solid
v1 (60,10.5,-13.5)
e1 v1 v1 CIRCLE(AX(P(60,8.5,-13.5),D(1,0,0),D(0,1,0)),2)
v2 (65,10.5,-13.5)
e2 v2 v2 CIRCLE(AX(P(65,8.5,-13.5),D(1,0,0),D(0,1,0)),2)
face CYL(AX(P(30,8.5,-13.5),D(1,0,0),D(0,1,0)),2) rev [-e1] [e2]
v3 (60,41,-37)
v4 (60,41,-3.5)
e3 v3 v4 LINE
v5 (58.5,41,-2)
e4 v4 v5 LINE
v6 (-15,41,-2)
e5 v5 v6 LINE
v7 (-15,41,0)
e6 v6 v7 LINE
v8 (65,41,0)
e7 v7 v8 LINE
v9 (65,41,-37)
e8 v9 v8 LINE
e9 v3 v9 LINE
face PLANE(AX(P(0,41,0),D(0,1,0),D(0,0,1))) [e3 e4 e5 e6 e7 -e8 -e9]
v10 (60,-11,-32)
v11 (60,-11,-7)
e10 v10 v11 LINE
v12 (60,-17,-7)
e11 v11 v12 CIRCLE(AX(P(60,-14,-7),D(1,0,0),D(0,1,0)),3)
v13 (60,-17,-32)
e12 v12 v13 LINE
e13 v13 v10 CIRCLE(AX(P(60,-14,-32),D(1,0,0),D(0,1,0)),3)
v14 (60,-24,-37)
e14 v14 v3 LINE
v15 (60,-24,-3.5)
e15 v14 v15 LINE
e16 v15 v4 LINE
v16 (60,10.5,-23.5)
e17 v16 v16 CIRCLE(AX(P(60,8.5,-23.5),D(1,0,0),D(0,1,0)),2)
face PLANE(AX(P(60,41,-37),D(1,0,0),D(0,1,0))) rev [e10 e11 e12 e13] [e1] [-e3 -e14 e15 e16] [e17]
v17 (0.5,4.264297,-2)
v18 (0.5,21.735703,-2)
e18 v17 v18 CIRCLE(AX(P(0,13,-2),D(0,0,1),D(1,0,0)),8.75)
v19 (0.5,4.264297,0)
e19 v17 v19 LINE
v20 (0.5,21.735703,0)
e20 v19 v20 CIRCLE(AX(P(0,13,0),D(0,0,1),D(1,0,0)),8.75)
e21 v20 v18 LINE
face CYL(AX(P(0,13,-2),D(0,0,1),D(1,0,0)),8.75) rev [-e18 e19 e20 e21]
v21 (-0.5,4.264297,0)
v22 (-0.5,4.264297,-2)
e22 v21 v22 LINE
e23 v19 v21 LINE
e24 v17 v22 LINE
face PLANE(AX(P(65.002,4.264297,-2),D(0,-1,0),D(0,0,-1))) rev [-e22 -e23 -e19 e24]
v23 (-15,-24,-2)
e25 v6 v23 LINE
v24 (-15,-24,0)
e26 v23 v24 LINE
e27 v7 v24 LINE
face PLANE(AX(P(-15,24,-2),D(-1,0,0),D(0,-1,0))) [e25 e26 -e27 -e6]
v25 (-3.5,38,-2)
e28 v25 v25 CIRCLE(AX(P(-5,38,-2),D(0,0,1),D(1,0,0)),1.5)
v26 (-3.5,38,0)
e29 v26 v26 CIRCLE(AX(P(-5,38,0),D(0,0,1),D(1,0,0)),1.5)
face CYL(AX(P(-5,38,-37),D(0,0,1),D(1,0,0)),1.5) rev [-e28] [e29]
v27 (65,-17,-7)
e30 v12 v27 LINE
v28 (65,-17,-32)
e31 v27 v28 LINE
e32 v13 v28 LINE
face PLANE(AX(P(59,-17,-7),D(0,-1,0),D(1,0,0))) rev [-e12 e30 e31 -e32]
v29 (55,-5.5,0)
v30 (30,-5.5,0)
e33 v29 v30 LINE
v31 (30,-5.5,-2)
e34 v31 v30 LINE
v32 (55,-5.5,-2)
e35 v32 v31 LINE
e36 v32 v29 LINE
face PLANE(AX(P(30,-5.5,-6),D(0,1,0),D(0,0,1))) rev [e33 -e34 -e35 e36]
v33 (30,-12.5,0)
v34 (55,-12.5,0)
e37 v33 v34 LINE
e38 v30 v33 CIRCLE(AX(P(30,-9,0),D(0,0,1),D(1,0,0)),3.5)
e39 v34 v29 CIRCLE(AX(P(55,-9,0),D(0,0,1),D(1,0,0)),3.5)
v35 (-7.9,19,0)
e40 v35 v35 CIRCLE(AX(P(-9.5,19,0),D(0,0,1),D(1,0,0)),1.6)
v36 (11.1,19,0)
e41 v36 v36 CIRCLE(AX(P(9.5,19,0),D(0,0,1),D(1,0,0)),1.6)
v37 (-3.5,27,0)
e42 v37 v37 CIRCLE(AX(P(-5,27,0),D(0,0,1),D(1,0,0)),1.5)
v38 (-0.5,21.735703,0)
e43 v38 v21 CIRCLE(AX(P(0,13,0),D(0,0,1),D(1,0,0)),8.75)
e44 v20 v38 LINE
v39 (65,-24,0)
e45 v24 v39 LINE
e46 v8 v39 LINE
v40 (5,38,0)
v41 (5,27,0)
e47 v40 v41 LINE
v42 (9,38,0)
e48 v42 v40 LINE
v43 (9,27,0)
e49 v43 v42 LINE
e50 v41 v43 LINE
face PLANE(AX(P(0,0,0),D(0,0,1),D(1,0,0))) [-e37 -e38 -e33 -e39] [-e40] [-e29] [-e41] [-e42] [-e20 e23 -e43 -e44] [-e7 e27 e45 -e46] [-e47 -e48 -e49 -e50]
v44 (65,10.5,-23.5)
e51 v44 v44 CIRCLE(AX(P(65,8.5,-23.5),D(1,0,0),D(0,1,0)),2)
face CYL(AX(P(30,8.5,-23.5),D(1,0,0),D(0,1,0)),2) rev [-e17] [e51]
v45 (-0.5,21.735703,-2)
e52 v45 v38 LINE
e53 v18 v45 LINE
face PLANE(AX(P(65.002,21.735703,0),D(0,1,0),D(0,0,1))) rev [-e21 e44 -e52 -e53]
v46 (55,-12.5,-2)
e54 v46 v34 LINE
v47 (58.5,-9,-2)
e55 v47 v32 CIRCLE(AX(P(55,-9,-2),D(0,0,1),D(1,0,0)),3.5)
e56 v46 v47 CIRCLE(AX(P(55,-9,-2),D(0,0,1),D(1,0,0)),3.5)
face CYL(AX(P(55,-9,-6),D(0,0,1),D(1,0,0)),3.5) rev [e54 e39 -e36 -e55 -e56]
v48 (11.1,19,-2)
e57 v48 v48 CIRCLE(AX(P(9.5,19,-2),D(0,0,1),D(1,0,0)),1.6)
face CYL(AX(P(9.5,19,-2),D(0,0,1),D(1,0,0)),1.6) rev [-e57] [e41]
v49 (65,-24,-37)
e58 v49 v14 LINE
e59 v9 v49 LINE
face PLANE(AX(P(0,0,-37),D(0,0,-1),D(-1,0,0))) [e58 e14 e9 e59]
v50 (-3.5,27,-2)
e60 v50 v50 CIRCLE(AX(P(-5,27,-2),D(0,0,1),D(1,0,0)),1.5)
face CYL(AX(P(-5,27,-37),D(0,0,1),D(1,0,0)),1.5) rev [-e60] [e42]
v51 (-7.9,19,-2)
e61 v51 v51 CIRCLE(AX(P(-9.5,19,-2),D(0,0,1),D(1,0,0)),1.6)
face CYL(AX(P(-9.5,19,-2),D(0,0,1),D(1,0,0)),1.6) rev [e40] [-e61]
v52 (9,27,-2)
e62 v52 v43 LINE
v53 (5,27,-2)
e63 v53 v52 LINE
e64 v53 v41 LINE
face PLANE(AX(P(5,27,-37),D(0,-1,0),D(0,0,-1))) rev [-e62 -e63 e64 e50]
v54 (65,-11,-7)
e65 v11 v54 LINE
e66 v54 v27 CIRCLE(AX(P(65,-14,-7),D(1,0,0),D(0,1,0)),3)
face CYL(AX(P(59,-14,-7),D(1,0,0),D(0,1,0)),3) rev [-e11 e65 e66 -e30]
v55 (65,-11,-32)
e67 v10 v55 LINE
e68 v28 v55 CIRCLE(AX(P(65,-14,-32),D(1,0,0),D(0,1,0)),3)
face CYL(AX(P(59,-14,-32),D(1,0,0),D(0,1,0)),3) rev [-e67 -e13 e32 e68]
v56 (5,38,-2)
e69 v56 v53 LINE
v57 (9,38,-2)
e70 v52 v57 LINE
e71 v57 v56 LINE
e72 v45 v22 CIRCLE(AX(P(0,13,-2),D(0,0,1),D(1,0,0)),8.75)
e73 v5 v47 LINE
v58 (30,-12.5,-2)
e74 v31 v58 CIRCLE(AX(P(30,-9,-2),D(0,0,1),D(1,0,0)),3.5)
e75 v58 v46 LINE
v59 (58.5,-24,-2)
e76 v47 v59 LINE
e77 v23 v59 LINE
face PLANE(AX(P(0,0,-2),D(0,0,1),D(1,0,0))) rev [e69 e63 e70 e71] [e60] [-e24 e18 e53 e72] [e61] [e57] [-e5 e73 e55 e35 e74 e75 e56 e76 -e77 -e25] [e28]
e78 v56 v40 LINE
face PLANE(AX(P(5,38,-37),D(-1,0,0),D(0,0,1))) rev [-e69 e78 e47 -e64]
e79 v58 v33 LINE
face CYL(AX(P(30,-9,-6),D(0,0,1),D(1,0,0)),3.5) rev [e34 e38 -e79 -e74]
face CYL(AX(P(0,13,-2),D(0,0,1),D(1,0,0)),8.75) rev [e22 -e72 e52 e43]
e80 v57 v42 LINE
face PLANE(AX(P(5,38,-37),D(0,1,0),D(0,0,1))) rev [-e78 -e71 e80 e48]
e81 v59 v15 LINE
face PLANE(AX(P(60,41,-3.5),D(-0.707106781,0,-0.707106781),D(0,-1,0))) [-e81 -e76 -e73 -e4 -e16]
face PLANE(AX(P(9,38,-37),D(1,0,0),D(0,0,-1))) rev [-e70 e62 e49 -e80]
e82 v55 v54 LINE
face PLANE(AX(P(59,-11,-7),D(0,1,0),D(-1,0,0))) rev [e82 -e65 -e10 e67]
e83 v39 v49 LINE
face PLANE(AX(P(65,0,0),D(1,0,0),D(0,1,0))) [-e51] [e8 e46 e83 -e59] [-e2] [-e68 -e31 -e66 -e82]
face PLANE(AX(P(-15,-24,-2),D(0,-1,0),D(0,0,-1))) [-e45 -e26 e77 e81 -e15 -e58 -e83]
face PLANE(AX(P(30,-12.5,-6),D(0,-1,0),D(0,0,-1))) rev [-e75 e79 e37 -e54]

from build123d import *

# Parameters (mm, degrees)
SKETCH_1_W           = 30
SKETCH_1_H           = 48
EXTRUDE_1_DEPTH      = 2
SKETCH_2_R           = 1.6
CUT_EXTRUDE_1_DEPTH  = 2
SKETCH_3_R           = 8.75
CUT_EXTRUDE_2_DEPTH  = 2
SKETCH_4_W           = 30
SKETCH_4_H           = 2
EXTRUDE_2_DEPTH      = 17
SKETCH_14_W          = 0.5
SKETCH_14_H          = 2
CUT_EXTRUDE_6_DEPTH  = 67.738294854
SKETCH_15_W          = 2
SKETCH_15_H          = 65
EXTRUDE_7_DEPTH      = 50
SKETCH_16_W          = 5
SKETCH_16_H          = 65
EXTRUDE_8_DEPTH      = 35
SKETCH_17_R          = 2
CUT_EXTRUDE_7_DEPTH  = 35
SKETCH_18_W          = 2
SKETCH_18_H          = 28.264297395
EXTRUDE_9_DEPTH      = 1
EXTRUDE_10_REACH     = 87.675
SKETCH_19_W          = 2
SKETCH_19_H          = 19.264297395
CUT_EXTRUDE_8_DEPTH  = 6
CUT_EXTRUDE_9_DEPTH  = 6
CHAMFER_1_SIZE       = 1.5
SKETCH_22_R          = 1.5
SKETCH_22_W          = 4
SKETCH_22_H          = 11
CUT_EXTRUDE_10_DEPTH = 86.293610546


with BuildPart() as part:
    # 草图1 → 凸台-拉伸1 (new body)
    with BuildSketch(Plane.XY):
        Rectangle(SKETCH_1_W, SKETCH_1_H)
    extrude(amount=-EXTRUDE_1_DEPTH)

    # 草图2 → 切除-拉伸1 (cut)
    with BuildSketch(Plane.XY):
        with Locations((-9.5, 19)):
            Circle(SKETCH_2_R)
        with Locations((9.5, 19)):
            Circle(SKETCH_2_R)
    extrude(amount=-CUT_EXTRUDE_1_DEPTH, mode=Mode.SUBTRACT)

    # 草图3 → 切除-拉伸2 (cut)
    with BuildSketch(Plane.XY):
        with Locations((0, 13)):
            Circle(SKETCH_3_R)
    extrude(amount=-CUT_EXTRUDE_2_DEPTH, mode=Mode.SUBTRACT)

    # 草图4 → 凸台-拉伸2 (add)
    with BuildSketch(Plane(origin=(0, 24, 0), x_dir=(1, 0, 0), z_dir=(0, 1, 0))):
        with Locations((0, 1)):
            Rectangle(SKETCH_4_W, SKETCH_4_H)
    extrude(amount=EXTRUDE_2_DEPTH)

    # 草图14 → 切除-拉伸6 (cut, through all)
    with BuildSketch(Plane.XZ.offset(24)):
        with Locations((-0.25, -1)):
            Rectangle(SKETCH_14_W, SKETCH_14_H)
    extrude(amount=-CUT_EXTRUDE_6_DEPTH, mode=Mode.SUBTRACT)


with BuildPart() as cut_extrude_6_piece_1:
    # of the separate pieces the step leaves, piece 1, a body of its own (cut_extrude_6_pieces)
    add(part.part.solids().sort_by_distance((15, -24, 0))[0])

    # 草图15 → 凸台-拉伸7 (add)
    with BuildSketch(Plane(origin=(15, 0, 0), x_dir=(0, 0, -1), z_dir=(1, 0, 0))):
        with Locations((1, 8.5)):
            Rectangle(SKETCH_15_W, SKETCH_15_H)
    extrude(amount=EXTRUDE_7_DEPTH)

    # 草图16 → 凸台-拉伸8 (add)
    with BuildSketch(Plane(origin=(0, 0, -2), x_dir=(-1, 0, 0), z_dir=(0, 0, -1))):
        with Locations((-62.5, 8.5)):
            Rectangle(SKETCH_16_W, SKETCH_16_H)
    extrude(amount=EXTRUDE_8_DEPTH)

    # 草图17 → 切除-拉伸7 (cut)
    with BuildSketch(Plane(origin=(65, 0, 0), x_dir=(0, 0, -1), z_dir=(1, 0, 0))):
        with Locations(Location((13.5, 8.5, 0), (0, 0, 90))):
            Circle(SKETCH_17_R)
        with Locations(Location((23.5, 8.5, 0), (0, 0, 90))):
            Circle(SKETCH_17_R)
    extrude(amount=-CUT_EXTRUDE_7_DEPTH, mode=Mode.SUBTRACT)



with BuildPart() as cut_extrude_6_piece_2:
    # of the separate pieces the step leaves, piece 2, a body of its own (cut_extrude_6_pieces)
    add(part.part.solids().sort_by_distance((-15, -24, 0))[0])


with BuildPart() as cut_extrude_6_piece_1_1:
    add(cut_extrude_6_piece_1.part)

    add(cut_extrude_6_piece_2.part)  # 凸台-拉伸9 merges 切除-拉伸6 piece 2
    # 草图18 → 凸台-拉伸9 (add)
    with BuildSketch(Plane(origin=(-0.5, 0, 0), x_dir=(0, 0, -1), z_dir=(1, 0, 0))):
        with Locations((1, -9.867851303)):
            Rectangle(SKETCH_18_W, SKETCH_18_H)
    extrude(amount=EXTRUDE_9_DEPTH)

    # 草图19 → 凸台-拉伸10 (add, up to next)
    with BuildSketch(Plane(origin=(-0.5, 0, 0), x_dir=(0, 0, -1), z_dir=(1, 0, 0)), mode=Mode.PRIVATE) as extrude_10_sk1:
        with Locations((1, 31.367851303)):
            Rectangle(SKETCH_19_W, SKETCH_19_H)
    extrude_10_tool1 = extrude(extrude_10_sk1.sketch, amount=EXTRUDE_10_REACH, mode=Mode.PRIVATE) - cut_extrude_6_piece_1_1.part
    add(extrude_10_tool1.solids().sort_by_distance((-0.5, 31.367851, -1))[0])

    # 草图20 → 切除-拉伸8 (cut)
    with BuildSketch(Plane.XY):
        with BuildLine():
            Line((30, -5.5), (55, -5.5))
            ThreePointArc((55, -5.5), (58.5, -9), (55, -12.5))
            Line((55, -12.5), (30, -12.5))
            ThreePointArc((30, -12.5), (26.5, -9), (30, -5.5))
        make_face()
    extrude(amount=-CUT_EXTRUDE_8_DEPTH, mode=Mode.SUBTRACT)

    # 草图21 → 切除-拉伸9 (cut)
    with BuildSketch(Plane(origin=(65, 0, 0), x_dir=(0, 0, -1), z_dir=(1, 0, 0))):
        with BuildLine():
            Line((7, -11), (32, -11))
            ThreePointArc((32, -11), (35, -14), (32, -17))
            Line((32, -17), (7, -17))
            ThreePointArc((7, -17), (4, -14), (7, -11))
        make_face()
    extrude(amount=-CUT_EXTRUDE_9_DEPTH, mode=Mode.SUBTRACT)

    # 倒角1
    chamfer_1_edges = [cut_extrude_6_piece_1_1.edges().sort_by_distance(p)[0] for p in [
        (60, 8.5, -2),
    ]]
    chamfer(chamfer_1_edges, length=CHAMFER_1_SIZE - 0.0001)  # a hair under: the kernel refuses the full size

    # 草图22 → 切除-拉伸10 (cut, through all)
    with BuildSketch(Plane.XY):
        with Locations((-5, 38)):
            Circle(SKETCH_22_R)
        with Locations((-5, 27)):
            Circle(SKETCH_22_R)
        with Locations((7, 32.5)):
            Rectangle(SKETCH_22_W, SKETCH_22_H)
    extrude(amount=-CUT_EXTRUDE_10_DEPTH, mode=Mode.SUBTRACT)


solid = cut_extrude_6_piece_1_1.part
